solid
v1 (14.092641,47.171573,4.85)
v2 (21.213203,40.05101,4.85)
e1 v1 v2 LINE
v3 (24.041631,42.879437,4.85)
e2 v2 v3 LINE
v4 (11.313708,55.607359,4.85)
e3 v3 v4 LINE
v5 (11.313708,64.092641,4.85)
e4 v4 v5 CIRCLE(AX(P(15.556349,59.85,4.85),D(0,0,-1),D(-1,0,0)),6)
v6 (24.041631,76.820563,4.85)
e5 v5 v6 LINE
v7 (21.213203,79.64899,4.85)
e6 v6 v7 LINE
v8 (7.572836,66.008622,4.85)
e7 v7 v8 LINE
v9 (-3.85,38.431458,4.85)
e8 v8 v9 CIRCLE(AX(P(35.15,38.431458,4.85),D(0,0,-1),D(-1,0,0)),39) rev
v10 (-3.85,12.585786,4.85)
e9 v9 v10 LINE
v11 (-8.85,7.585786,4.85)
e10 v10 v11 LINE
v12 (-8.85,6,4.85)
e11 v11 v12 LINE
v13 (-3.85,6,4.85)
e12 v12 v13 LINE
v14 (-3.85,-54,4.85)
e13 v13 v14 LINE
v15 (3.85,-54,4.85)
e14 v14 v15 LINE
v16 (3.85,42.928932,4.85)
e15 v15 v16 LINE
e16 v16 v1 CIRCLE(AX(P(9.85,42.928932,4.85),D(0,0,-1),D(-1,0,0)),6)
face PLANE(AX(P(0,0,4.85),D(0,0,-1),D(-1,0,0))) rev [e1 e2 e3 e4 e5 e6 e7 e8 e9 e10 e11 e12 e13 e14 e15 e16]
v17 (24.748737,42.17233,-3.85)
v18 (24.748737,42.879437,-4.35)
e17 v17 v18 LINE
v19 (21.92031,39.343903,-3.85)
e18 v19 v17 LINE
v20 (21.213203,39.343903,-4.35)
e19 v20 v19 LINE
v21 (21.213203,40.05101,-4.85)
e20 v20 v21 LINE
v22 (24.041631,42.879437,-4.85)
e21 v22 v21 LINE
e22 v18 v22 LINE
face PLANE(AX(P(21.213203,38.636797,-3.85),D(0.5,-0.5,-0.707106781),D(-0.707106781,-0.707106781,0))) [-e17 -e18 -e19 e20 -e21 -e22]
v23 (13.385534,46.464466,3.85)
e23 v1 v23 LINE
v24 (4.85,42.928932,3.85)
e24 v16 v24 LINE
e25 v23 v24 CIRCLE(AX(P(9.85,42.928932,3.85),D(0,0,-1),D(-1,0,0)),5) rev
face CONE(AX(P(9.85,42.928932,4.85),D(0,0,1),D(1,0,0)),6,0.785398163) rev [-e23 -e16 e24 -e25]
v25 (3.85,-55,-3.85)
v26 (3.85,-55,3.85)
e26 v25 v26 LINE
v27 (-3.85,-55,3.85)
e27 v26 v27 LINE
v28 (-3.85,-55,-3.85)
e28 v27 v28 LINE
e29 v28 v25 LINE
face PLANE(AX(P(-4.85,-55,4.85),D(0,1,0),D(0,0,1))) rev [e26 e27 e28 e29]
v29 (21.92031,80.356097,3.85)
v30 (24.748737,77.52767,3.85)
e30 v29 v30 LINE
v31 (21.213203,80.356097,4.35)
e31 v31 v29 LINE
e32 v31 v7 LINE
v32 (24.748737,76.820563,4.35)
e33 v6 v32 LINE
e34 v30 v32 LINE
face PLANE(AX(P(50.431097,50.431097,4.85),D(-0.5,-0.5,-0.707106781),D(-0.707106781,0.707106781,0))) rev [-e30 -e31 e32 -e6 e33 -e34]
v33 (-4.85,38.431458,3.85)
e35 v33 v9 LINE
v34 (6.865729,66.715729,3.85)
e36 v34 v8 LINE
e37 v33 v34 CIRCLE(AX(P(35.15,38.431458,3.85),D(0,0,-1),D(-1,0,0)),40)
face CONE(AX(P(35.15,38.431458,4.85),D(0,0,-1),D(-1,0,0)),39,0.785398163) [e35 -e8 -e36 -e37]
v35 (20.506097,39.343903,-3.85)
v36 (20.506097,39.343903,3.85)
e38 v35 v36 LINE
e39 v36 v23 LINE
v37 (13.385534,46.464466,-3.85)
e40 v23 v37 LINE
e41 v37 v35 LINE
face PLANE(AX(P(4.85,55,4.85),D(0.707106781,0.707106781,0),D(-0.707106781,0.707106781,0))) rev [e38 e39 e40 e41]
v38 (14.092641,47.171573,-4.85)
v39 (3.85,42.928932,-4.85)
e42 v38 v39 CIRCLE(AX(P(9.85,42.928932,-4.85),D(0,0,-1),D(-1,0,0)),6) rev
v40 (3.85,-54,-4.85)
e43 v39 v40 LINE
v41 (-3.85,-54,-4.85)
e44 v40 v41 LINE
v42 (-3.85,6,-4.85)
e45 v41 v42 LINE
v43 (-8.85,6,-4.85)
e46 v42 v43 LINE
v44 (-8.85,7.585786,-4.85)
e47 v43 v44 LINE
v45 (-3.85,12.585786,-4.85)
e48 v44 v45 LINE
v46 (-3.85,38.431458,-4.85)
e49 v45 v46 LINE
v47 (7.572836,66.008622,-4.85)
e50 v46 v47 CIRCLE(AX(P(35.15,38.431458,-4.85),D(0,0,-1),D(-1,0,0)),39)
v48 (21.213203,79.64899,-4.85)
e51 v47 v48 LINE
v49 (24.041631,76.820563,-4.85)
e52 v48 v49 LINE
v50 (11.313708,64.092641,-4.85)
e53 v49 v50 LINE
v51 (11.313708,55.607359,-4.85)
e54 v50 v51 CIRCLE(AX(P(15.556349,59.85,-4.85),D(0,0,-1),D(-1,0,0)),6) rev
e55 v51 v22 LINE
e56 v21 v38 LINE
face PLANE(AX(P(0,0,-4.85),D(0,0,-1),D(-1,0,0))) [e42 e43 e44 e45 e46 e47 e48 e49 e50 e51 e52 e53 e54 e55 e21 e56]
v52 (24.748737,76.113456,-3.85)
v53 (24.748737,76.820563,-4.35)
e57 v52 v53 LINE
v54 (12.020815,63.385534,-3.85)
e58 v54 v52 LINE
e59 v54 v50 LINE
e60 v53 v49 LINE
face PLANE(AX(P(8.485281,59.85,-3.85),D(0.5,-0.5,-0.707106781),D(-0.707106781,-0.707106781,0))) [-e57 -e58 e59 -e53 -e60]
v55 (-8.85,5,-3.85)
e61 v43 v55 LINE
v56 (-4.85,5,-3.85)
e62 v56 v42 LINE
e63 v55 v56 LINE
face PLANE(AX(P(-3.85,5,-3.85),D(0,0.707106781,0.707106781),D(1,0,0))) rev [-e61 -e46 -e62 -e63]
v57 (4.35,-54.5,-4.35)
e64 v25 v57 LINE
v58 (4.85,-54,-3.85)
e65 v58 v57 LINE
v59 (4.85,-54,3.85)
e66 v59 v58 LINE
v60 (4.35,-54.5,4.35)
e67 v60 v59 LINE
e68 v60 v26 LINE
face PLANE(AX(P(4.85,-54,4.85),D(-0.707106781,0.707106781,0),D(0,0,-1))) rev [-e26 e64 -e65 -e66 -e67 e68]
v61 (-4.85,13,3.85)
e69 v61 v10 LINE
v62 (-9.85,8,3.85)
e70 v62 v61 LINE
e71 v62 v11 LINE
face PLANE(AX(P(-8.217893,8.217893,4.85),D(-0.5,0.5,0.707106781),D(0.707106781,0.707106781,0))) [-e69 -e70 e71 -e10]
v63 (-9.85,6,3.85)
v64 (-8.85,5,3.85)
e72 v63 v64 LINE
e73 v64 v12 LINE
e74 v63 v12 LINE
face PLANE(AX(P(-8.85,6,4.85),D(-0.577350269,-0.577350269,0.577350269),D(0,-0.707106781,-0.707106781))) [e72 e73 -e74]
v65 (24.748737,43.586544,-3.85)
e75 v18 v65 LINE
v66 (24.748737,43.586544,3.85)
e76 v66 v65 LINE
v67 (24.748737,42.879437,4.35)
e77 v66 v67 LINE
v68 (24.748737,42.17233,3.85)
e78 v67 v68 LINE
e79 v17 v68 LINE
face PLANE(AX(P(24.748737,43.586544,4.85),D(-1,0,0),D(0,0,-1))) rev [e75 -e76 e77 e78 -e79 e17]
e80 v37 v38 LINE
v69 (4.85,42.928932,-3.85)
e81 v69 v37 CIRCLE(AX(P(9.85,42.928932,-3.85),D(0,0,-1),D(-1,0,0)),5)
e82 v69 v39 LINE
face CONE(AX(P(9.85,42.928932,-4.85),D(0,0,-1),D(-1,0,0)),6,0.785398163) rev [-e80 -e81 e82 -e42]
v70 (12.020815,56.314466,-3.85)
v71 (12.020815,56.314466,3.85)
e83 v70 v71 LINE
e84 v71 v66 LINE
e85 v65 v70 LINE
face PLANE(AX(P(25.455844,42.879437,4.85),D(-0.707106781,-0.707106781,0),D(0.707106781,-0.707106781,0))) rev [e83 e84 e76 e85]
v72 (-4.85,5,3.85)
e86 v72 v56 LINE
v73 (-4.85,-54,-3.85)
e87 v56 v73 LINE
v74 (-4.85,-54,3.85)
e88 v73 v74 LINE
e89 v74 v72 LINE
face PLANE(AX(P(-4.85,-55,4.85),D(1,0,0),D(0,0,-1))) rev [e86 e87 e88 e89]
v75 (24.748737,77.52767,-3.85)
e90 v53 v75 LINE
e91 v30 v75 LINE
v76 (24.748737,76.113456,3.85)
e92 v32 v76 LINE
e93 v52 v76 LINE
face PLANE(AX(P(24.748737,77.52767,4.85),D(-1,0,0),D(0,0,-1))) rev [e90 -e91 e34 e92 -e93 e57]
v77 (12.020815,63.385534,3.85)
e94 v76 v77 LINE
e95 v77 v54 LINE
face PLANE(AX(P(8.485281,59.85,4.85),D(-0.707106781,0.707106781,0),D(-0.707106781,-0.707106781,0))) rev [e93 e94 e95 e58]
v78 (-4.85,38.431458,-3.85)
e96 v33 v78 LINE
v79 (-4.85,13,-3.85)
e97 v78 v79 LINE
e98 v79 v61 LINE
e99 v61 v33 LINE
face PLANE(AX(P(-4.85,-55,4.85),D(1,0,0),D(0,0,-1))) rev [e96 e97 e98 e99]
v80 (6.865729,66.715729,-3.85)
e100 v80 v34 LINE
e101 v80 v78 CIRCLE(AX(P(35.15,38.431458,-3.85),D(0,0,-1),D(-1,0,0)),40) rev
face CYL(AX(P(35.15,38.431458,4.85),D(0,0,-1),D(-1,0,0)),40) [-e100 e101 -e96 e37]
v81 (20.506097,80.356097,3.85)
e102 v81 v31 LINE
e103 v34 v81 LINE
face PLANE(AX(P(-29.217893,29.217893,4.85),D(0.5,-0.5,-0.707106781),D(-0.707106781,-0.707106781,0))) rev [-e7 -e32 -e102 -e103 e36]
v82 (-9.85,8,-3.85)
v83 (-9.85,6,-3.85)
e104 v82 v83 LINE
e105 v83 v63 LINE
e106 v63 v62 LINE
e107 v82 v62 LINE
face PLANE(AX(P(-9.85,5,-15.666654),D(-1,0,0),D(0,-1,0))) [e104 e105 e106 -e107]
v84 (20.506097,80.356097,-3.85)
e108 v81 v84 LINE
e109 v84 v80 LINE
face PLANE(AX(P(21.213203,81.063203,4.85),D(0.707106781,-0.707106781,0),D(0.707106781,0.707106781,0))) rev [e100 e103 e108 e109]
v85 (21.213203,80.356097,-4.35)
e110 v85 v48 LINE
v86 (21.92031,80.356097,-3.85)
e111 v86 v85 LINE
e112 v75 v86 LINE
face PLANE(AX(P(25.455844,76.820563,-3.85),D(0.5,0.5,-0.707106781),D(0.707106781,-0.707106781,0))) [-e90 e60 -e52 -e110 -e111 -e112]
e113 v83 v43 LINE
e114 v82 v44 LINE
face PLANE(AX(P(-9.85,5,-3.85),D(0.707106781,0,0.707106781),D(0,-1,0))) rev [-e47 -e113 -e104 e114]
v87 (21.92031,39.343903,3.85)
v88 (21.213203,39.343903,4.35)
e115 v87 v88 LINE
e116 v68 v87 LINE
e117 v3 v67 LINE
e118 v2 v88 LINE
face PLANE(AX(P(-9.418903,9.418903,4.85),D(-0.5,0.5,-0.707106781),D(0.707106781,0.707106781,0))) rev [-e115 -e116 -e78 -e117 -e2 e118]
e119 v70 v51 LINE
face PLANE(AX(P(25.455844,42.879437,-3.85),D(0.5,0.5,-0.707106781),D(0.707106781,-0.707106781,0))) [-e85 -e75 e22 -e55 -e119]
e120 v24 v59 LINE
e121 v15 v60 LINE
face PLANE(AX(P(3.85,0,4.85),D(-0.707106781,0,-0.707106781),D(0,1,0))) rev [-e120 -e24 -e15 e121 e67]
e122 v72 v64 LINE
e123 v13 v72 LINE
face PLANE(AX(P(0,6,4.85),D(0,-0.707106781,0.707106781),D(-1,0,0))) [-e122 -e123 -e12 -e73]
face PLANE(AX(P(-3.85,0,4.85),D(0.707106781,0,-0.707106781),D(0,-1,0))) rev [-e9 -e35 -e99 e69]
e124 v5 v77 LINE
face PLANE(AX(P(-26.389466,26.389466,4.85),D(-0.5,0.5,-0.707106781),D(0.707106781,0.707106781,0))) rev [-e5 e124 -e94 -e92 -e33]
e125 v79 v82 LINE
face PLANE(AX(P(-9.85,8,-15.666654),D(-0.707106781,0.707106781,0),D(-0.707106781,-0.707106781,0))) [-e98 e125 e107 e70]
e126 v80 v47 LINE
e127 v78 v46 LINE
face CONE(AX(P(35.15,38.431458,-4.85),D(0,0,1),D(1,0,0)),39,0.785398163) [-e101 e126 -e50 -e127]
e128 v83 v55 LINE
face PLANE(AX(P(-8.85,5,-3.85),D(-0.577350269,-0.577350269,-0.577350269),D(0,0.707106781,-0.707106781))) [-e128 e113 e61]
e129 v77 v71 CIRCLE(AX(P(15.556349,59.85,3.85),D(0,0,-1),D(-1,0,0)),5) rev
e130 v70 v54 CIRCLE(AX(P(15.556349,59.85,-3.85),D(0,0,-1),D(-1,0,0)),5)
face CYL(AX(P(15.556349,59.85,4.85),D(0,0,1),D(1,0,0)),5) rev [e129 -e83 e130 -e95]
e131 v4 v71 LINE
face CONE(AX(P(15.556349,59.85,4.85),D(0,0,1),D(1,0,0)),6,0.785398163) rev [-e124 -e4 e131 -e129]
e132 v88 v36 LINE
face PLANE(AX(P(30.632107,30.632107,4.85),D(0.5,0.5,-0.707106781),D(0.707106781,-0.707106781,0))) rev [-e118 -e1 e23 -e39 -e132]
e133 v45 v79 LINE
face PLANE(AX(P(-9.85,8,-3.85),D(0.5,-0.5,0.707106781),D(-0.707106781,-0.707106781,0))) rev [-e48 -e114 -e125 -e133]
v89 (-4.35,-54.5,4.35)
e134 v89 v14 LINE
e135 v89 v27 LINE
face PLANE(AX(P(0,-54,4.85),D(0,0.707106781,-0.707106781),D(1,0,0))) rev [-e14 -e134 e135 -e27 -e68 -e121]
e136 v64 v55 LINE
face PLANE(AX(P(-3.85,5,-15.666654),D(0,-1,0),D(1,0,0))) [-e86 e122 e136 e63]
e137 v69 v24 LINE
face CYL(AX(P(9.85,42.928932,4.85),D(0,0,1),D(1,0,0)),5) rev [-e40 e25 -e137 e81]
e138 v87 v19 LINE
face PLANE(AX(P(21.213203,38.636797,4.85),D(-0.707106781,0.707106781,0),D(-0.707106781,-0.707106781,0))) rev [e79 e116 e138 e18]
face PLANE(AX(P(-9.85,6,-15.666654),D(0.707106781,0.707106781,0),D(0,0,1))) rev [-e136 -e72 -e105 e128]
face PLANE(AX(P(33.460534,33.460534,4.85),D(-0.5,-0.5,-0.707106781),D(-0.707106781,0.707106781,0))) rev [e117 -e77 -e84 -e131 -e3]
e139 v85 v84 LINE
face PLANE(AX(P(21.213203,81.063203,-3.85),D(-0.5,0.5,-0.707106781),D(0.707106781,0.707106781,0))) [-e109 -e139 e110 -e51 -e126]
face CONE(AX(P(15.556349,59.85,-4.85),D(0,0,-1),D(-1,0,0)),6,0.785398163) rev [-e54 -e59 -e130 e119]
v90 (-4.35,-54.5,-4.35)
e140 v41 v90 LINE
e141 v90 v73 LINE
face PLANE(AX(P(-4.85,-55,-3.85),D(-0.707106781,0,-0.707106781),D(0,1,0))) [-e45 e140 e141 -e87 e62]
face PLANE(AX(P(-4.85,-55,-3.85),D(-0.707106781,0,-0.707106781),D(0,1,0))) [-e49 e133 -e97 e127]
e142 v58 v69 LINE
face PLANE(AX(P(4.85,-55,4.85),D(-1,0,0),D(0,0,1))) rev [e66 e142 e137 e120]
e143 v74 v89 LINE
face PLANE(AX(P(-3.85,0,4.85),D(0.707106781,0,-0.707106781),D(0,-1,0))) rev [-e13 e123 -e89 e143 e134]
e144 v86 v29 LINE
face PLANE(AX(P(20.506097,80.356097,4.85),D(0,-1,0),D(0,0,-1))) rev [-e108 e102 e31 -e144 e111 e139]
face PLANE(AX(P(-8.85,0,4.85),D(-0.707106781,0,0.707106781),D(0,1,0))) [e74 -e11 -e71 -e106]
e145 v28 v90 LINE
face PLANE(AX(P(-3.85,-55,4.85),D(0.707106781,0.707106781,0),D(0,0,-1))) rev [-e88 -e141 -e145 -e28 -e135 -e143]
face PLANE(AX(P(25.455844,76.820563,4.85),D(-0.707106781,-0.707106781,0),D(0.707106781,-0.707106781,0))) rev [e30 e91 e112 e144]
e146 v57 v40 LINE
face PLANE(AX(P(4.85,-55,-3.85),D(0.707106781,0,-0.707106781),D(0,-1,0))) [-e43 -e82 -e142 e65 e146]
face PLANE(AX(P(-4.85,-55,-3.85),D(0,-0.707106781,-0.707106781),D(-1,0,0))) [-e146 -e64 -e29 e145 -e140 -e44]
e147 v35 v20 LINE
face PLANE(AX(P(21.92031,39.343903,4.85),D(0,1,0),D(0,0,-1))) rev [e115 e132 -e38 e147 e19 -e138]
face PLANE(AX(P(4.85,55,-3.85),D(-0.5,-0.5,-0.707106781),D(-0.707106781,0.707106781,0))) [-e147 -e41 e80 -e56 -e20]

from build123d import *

# Parameters (mm, degrees)
BOSS_EXTRUDE1_DEPTH = 4.85
FILLET1_R           = 5
FILLET2_R           = 40
FILLET3_R           = 5
CHAMFER1_SIZE       = 1
CHAMFER2_SIZE       = 1
CHAMFER3_SIZE       = 1
BOSS_EXTRUDE2_START = -9.7
BOSS_EXTRUDE2_DEPTH = 9.7
CHAMFER4_SIZE       = 1


with BuildPart() as part:
    # Sketch1 → Boss-Extrude1 (new, symmetric)
    with BuildSketch(Plane.XY):
        Polygon((4.85, 55), (21.213203436, 38.636796564), (25.455844123, 42.879437252), (8.485281374, 59.85), (25.455844123, 76.820562748), (21.213203436, 81.063203436), (-4.85, 55), (-4.85, -55), (4.85, -55), align=None)
    extrude(amount=BOSS_EXTRUDE1_DEPTH, both=True)

    # Fillet1
    fillet1_edges = [part.edges().sort_by_distance(p)[0] for p in [
        (4.85, 55, 0),
    ]]
    fillet(fillet1_edges, radius=FILLET1_R)

    # Fillet2
    fillet2_edges = [part.edges().sort_by_distance(p)[0] for p in [
        (-4.85, 55, 0),
    ]]
    fillet(fillet2_edges, radius=FILLET2_R)

    # Fillet3
    fillet3_edges = [part.edges().sort_by_distance(p)[0] for p in [
        (8.485281374, 59.85, 0),
    ]]
    fillet(fillet3_edges, radius=FILLET3_R)

    # Chamfer1
    chamfer1_edges = [part.edges().sort_by_distance(p)[0] for p in [
        (21.213203436, 81.063203436, 0),
        (25.455844123, 76.820562748, 0),
        (25.455844123, 42.879437252, 0),
        (21.213203436, 38.636796564, 0),
    ]]
    chamfer(chamfer1_edges, length=CHAMFER1_SIZE)

    # Chamfer2
    # the kernel refuses this chamfer: 1 mm, written as the material it takes off along each edge
    with BuildSketch(Plane(origin=(-4.85, 38.431457505, -4.85), x_dir=(0.9996219169112968, 0, -0.027495876610586487), z_dir=(0, -1, 0)), Plane(origin=(-4.85, 38.431457505, 4.85), x_dir=(-0.027495876610586487, 0, -0.9996219169112968), z_dir=(0, -1, 0))) as chamfer2_piece_1:
        Polygon((CHAMFER2_SIZE * 0.999621916911, CHAMFER2_SIZE * 0.0274958766106), (-CHAMFER2_SIZE * 0.0274958766106, CHAMFER2_SIZE * 0.999621916911), (0, 0), align=None)
    extrude(amount=96.003140493, mode=Mode.SUBTRACT)
    with BuildSketch(Plane(origin=(35.15, 38.431457505, -4.85), x_dir=(-1, 0, 0), z_dir=(0, -1, 0))) as chamfer2_piece_2:
        Polygon((40 - CHAMFER2_SIZE, 0), (40, -CHAMFER2_SIZE), (40, 0), align=None)
    revolve(axis=Axis((35.15, 38.431457505, -4.85), (0, 0, -1)), revolution_arc=45, mode=Mode.SUBTRACT)
    with BuildSketch(Plane(origin=(22.324551134, 82.174551134, -4.85), x_dir=(0.7068394360706736, -0.7068394360706733, -0.027495876610586494), z_dir=(-0.7071067811865475, -0.7071067811865477, 0)), Plane(origin=(22.324551134, 82.174551134, 4.85), x_dir=(-0.019442520806010343, 0.019442520806010336, -0.999621916911297), z_dir=(-0.7071067811865475, -0.7071067811865477, 0))) as chamfer2_piece_3:
        Polygon((CHAMFER2_SIZE * 0.999621916911, CHAMFER2_SIZE * 0.0274958766106), (-CHAMFER2_SIZE * 0.0274958766106, CHAMFER2_SIZE * 0.999621916911), (0, 0), align=None)
    extrude(amount=21.862076271, mode=Mode.SUBTRACT)
    with BuildSketch(Plane(origin=(26.567191821, 75.70921505, -4.85), x_dir=(-0.7068394360706752, -0.7068394360706718, -0.02749587661058676), z_dir=(-0.7071067811865458, 0.7071067811865493, 0)), Plane(origin=(26.567191821, 75.70921505, 4.85), x_dir=(0.019442520806010388, 0.019442520806010295, -0.999621916911297), z_dir=(-0.7071067811865458, 0.7071067811865493, 0)), Plane(origin=(20.101855737, 37.525448866, -4.85), x_dir=(-0.7068394360706738, 0.7068394360706732, -0.027495876610586494), z_dir=(0.7071067811865472, 0.7071067811865478, 0)), Plane(origin=(20.101855737, 37.525448866, 4.85), x_dir=(0.019442520806015523, -0.01944252080601551, -0.9996219169112968), z_dir=(0.7071067811865472, 0.7071067811865478, 0))) as chamfer2_piece_4:
        Polygon((CHAMFER2_SIZE * 0.999621916911, CHAMFER2_SIZE * 0.0274958766106), (-CHAMFER2_SIZE * 0.0274958766106, CHAMFER2_SIZE * 0.999621916911), (0, 0), align=None)
    extrude(amount=9.143365976, mode=Mode.SUBTRACT)
    with BuildSketch(Plane(origin=(35.15, 38.431457505, 4.85), x_dir=(-1, 0, 0), z_dir=(0, -1, 0))) as chamfer2_piece_5:
        Polygon((40, CHAMFER2_SIZE), (40 - CHAMFER2_SIZE, 0), (40, 0), align=None)
    revolve(axis=Axis((35.15, 38.431457505, 4.85), (0, 0, -1)), revolution_arc=45, mode=Mode.SUBTRACT)
    with BuildSketch(Plane(origin=(12.02081528, 63.385533906, 4.85), x_dir=(0.019442520806015513, -0.01944252080601552, -0.9996219169112968), z_dir=(0.7071067811865476, 0.7071067811865475, 0)), Plane(origin=(26.567191821, 41.768089553, 4.85), x_dir=(0.019442520806015516, 0.019442520806015516, -0.9996219169112968), z_dir=(-0.7071067811865476, 0.7071067811865476, 0)), Plane(origin=(12.02081528, 63.385533906, -4.85), x_dir=(-0.7068394360706736, 0.7068394360706736, -0.027495876610586462), z_dir=(0.7071067811865476, 0.7071067811865475, 0)), Plane(origin=(26.567191821, 41.768089553, -4.85), x_dir=(-0.7068394360706735, -0.7068394360706735, -0.027495876610586494), z_dir=(-0.7071067811865476, 0.7071067811865476, 0))) as chamfer2_piece_6:
        Polygon((CHAMFER2_SIZE * 0.999621916911, CHAMFER2_SIZE * 0.0274958766106), (-CHAMFER2_SIZE * 0.0274958766106, CHAMFER2_SIZE * 0.999621916911), (0, 0), align=None)
    extrude(amount=20.571682988, mode=Mode.SUBTRACT)
    with BuildSketch(Plane(origin=(15.556349186, 59.85, 4.85), x_dir=(-0.7071067811865474, 0.7071067811865477, 0), z_dir=(0.7071067811865477, 0.7071067811865474, 0))) as chamfer2_piece_7:
        Polygon((5, -CHAMFER2_SIZE), (5 + CHAMFER2_SIZE, 0), (5, 0), align=None)
    revolve(axis=Axis((15.556349186, 59.85, 4.85), (0, 0, 1)), revolution_arc=90, mode=Mode.SUBTRACT)
    with BuildSketch(Plane(origin=(15.556349186, 59.85, -4.85), x_dir=(-0.7071067811865474, 0.7071067811865477, 0), z_dir=(0.7071067811865477, 0.7071067811865474, 0))) as chamfer2_piece_8:
        Polygon((5 + CHAMFER2_SIZE, 0), (5, CHAMFER2_SIZE), (5, 0), align=None)
    revolve(axis=Axis((15.556349186, 59.85, -4.85), (0, 0, 1)), revolution_arc=90, mode=Mode.SUBTRACT)
    with BuildSketch(Plane(origin=(13.385533906, 46.464466094, -4.85), x_dir=(0.7068394360706735, 0.7068394360706737, -0.027495876610586462), z_dir=(0.7071067811865477, -0.7071067811865474, 0)), Plane(origin=(13.385533906, 46.464466094, 4.85), x_dir=(-0.019442520806016373, -0.01944252080601638, -0.9996219169112965), z_dir=(0.7071067811865477, -0.7071067811865474, 0))) as chamfer2_piece_9:
        Polygon((CHAMFER2_SIZE * 0.999621916911, CHAMFER2_SIZE * 0.0274958766106), (-CHAMFER2_SIZE * 0.0274958766106, CHAMFER2_SIZE * 0.999621916911), (0, 0), align=None)
    extrude(amount=12.641679399, mode=Mode.SUBTRACT)
    with BuildSketch(Plane(origin=(9.85, 42.928932188, -4.85), x_dir=(0.7071067811865479, 0.7071067811865471, 0), z_dir=(0.7071067811865471, -0.7071067811865479, 0))) as chamfer2_piece_10:
        Polygon((5 + CHAMFER2_SIZE, 0), (5, CHAMFER2_SIZE), (5, 0), align=None)
    revolve(axis=Axis((9.85, 42.928932188, -4.85), (0, 0, 1)), revolution_arc=135, mode=Mode.SUBTRACT)
    with BuildSketch(Plane(origin=(4.85, -57.571682988, -4.85), x_dir=(-0.9996219169112968, 0, -0.027495876610586487), z_dir=(0, 1, 0)), Plane(origin=(4.85, -57.571682988, 4.85), x_dir=(0.027495876610586487, 0, -0.9996219169112968), z_dir=(0, 1, 0))) as chamfer2_piece_11:
        Polygon((CHAMFER2_SIZE * 0.999621916911, CHAMFER2_SIZE * 0.0274958766106), (-CHAMFER2_SIZE * 0.0274958766106, CHAMFER2_SIZE * 0.999621916911), (0, 0), align=None)
    extrude(amount=100.500615176, mode=Mode.SUBTRACT)
    with BuildSketch(Plane(origin=(9.85, 42.928932188, 4.85), x_dir=(0.7071067811865479, 0.7071067811865471, 0), z_dir=(0.7071067811865471, -0.7071067811865479, 0))) as chamfer2_piece_12:
        Polygon((5, -CHAMFER2_SIZE), (5 + CHAMFER2_SIZE, 0), (5, 0), align=None)
    revolve(axis=Axis((9.85, 42.928932188, 4.85), (0, 0, 1)), revolution_arc=135, mode=Mode.SUBTRACT)

    # Chamfer3
    # the kernel refuses this chamfer: 1 mm, written as the material it takes off along each edge
    with BuildSketch(Plane(origin=(4.85, -55, 6.421682988), x_dir=(-0.9996219169112968, -0.027495876610589075, 0), z_dir=(0, 0, -1)), Plane(origin=(-6.421682988, -55, 4.85), x_dir=(0, -0.02749587661058907, -0.9996219169112965), z_dir=(1, 0, 0)), Plane(origin=(-6.421682988, -55, -4.85), x_dir=(0, 0.9996219169112968, -0.027495876610586414), z_dir=(1, 0, 0))) as chamfer3_piece_1:
        Polygon((CHAMFER3_SIZE * 0.999621916911, CHAMFER3_SIZE * 0.0274958766106), (-CHAMFER3_SIZE * 0.0274958766106, CHAMFER3_SIZE * 0.999621916911), (0, 0), align=None)
    extrude(amount=12.843365976, mode=Mode.SUBTRACT)
    with BuildSketch(Plane(origin=(-4.85, -55, 6.421682988), x_dir=(0.9996219169112968, -0.027495876610589075, 0), z_dir=(0, 0, -1))) as chamfer3_piece_2:
        Polygon((CHAMFER3_SIZE * 0.999621916911, -CHAMFER3_SIZE * 0.0274958766106), (-CHAMFER3_SIZE * 0.0274958766106, -CHAMFER3_SIZE * 0.999621916911), (0, 0), align=None)
    extrude(amount=12.843365976, mode=Mode.SUBTRACT)

    # Sketch2 → Boss-Extrude2 (add)
    with BuildSketch(Plane.XY.offset(4.85).offset(BOSS_EXTRUDE2_START)):
        Polygon((-3.85, 5), (-9.85, 5), (-9.85, 8), (-3.85, 14), align=None)
    extrude(amount=BOSS_EXTRUDE2_DEPTH)

    # Chamfer4
    chamfer4_edges = [part.edges().sort_by_distance(p)[0] for p in [
        (-6.85, 11, 4.85),
        (-9.85, 6.5, 4.85),
        (-6.85, 5, 4.85),
        (-6.85, 11, -4.85),
        (-9.85, 6.5, -4.85),
        (-6.85, 5, -4.85),
        (-9.85, 5, 0),
    ]]
    chamfer(chamfer4_edges, length=CHAMFER4_SIZE)


solid = part.part
